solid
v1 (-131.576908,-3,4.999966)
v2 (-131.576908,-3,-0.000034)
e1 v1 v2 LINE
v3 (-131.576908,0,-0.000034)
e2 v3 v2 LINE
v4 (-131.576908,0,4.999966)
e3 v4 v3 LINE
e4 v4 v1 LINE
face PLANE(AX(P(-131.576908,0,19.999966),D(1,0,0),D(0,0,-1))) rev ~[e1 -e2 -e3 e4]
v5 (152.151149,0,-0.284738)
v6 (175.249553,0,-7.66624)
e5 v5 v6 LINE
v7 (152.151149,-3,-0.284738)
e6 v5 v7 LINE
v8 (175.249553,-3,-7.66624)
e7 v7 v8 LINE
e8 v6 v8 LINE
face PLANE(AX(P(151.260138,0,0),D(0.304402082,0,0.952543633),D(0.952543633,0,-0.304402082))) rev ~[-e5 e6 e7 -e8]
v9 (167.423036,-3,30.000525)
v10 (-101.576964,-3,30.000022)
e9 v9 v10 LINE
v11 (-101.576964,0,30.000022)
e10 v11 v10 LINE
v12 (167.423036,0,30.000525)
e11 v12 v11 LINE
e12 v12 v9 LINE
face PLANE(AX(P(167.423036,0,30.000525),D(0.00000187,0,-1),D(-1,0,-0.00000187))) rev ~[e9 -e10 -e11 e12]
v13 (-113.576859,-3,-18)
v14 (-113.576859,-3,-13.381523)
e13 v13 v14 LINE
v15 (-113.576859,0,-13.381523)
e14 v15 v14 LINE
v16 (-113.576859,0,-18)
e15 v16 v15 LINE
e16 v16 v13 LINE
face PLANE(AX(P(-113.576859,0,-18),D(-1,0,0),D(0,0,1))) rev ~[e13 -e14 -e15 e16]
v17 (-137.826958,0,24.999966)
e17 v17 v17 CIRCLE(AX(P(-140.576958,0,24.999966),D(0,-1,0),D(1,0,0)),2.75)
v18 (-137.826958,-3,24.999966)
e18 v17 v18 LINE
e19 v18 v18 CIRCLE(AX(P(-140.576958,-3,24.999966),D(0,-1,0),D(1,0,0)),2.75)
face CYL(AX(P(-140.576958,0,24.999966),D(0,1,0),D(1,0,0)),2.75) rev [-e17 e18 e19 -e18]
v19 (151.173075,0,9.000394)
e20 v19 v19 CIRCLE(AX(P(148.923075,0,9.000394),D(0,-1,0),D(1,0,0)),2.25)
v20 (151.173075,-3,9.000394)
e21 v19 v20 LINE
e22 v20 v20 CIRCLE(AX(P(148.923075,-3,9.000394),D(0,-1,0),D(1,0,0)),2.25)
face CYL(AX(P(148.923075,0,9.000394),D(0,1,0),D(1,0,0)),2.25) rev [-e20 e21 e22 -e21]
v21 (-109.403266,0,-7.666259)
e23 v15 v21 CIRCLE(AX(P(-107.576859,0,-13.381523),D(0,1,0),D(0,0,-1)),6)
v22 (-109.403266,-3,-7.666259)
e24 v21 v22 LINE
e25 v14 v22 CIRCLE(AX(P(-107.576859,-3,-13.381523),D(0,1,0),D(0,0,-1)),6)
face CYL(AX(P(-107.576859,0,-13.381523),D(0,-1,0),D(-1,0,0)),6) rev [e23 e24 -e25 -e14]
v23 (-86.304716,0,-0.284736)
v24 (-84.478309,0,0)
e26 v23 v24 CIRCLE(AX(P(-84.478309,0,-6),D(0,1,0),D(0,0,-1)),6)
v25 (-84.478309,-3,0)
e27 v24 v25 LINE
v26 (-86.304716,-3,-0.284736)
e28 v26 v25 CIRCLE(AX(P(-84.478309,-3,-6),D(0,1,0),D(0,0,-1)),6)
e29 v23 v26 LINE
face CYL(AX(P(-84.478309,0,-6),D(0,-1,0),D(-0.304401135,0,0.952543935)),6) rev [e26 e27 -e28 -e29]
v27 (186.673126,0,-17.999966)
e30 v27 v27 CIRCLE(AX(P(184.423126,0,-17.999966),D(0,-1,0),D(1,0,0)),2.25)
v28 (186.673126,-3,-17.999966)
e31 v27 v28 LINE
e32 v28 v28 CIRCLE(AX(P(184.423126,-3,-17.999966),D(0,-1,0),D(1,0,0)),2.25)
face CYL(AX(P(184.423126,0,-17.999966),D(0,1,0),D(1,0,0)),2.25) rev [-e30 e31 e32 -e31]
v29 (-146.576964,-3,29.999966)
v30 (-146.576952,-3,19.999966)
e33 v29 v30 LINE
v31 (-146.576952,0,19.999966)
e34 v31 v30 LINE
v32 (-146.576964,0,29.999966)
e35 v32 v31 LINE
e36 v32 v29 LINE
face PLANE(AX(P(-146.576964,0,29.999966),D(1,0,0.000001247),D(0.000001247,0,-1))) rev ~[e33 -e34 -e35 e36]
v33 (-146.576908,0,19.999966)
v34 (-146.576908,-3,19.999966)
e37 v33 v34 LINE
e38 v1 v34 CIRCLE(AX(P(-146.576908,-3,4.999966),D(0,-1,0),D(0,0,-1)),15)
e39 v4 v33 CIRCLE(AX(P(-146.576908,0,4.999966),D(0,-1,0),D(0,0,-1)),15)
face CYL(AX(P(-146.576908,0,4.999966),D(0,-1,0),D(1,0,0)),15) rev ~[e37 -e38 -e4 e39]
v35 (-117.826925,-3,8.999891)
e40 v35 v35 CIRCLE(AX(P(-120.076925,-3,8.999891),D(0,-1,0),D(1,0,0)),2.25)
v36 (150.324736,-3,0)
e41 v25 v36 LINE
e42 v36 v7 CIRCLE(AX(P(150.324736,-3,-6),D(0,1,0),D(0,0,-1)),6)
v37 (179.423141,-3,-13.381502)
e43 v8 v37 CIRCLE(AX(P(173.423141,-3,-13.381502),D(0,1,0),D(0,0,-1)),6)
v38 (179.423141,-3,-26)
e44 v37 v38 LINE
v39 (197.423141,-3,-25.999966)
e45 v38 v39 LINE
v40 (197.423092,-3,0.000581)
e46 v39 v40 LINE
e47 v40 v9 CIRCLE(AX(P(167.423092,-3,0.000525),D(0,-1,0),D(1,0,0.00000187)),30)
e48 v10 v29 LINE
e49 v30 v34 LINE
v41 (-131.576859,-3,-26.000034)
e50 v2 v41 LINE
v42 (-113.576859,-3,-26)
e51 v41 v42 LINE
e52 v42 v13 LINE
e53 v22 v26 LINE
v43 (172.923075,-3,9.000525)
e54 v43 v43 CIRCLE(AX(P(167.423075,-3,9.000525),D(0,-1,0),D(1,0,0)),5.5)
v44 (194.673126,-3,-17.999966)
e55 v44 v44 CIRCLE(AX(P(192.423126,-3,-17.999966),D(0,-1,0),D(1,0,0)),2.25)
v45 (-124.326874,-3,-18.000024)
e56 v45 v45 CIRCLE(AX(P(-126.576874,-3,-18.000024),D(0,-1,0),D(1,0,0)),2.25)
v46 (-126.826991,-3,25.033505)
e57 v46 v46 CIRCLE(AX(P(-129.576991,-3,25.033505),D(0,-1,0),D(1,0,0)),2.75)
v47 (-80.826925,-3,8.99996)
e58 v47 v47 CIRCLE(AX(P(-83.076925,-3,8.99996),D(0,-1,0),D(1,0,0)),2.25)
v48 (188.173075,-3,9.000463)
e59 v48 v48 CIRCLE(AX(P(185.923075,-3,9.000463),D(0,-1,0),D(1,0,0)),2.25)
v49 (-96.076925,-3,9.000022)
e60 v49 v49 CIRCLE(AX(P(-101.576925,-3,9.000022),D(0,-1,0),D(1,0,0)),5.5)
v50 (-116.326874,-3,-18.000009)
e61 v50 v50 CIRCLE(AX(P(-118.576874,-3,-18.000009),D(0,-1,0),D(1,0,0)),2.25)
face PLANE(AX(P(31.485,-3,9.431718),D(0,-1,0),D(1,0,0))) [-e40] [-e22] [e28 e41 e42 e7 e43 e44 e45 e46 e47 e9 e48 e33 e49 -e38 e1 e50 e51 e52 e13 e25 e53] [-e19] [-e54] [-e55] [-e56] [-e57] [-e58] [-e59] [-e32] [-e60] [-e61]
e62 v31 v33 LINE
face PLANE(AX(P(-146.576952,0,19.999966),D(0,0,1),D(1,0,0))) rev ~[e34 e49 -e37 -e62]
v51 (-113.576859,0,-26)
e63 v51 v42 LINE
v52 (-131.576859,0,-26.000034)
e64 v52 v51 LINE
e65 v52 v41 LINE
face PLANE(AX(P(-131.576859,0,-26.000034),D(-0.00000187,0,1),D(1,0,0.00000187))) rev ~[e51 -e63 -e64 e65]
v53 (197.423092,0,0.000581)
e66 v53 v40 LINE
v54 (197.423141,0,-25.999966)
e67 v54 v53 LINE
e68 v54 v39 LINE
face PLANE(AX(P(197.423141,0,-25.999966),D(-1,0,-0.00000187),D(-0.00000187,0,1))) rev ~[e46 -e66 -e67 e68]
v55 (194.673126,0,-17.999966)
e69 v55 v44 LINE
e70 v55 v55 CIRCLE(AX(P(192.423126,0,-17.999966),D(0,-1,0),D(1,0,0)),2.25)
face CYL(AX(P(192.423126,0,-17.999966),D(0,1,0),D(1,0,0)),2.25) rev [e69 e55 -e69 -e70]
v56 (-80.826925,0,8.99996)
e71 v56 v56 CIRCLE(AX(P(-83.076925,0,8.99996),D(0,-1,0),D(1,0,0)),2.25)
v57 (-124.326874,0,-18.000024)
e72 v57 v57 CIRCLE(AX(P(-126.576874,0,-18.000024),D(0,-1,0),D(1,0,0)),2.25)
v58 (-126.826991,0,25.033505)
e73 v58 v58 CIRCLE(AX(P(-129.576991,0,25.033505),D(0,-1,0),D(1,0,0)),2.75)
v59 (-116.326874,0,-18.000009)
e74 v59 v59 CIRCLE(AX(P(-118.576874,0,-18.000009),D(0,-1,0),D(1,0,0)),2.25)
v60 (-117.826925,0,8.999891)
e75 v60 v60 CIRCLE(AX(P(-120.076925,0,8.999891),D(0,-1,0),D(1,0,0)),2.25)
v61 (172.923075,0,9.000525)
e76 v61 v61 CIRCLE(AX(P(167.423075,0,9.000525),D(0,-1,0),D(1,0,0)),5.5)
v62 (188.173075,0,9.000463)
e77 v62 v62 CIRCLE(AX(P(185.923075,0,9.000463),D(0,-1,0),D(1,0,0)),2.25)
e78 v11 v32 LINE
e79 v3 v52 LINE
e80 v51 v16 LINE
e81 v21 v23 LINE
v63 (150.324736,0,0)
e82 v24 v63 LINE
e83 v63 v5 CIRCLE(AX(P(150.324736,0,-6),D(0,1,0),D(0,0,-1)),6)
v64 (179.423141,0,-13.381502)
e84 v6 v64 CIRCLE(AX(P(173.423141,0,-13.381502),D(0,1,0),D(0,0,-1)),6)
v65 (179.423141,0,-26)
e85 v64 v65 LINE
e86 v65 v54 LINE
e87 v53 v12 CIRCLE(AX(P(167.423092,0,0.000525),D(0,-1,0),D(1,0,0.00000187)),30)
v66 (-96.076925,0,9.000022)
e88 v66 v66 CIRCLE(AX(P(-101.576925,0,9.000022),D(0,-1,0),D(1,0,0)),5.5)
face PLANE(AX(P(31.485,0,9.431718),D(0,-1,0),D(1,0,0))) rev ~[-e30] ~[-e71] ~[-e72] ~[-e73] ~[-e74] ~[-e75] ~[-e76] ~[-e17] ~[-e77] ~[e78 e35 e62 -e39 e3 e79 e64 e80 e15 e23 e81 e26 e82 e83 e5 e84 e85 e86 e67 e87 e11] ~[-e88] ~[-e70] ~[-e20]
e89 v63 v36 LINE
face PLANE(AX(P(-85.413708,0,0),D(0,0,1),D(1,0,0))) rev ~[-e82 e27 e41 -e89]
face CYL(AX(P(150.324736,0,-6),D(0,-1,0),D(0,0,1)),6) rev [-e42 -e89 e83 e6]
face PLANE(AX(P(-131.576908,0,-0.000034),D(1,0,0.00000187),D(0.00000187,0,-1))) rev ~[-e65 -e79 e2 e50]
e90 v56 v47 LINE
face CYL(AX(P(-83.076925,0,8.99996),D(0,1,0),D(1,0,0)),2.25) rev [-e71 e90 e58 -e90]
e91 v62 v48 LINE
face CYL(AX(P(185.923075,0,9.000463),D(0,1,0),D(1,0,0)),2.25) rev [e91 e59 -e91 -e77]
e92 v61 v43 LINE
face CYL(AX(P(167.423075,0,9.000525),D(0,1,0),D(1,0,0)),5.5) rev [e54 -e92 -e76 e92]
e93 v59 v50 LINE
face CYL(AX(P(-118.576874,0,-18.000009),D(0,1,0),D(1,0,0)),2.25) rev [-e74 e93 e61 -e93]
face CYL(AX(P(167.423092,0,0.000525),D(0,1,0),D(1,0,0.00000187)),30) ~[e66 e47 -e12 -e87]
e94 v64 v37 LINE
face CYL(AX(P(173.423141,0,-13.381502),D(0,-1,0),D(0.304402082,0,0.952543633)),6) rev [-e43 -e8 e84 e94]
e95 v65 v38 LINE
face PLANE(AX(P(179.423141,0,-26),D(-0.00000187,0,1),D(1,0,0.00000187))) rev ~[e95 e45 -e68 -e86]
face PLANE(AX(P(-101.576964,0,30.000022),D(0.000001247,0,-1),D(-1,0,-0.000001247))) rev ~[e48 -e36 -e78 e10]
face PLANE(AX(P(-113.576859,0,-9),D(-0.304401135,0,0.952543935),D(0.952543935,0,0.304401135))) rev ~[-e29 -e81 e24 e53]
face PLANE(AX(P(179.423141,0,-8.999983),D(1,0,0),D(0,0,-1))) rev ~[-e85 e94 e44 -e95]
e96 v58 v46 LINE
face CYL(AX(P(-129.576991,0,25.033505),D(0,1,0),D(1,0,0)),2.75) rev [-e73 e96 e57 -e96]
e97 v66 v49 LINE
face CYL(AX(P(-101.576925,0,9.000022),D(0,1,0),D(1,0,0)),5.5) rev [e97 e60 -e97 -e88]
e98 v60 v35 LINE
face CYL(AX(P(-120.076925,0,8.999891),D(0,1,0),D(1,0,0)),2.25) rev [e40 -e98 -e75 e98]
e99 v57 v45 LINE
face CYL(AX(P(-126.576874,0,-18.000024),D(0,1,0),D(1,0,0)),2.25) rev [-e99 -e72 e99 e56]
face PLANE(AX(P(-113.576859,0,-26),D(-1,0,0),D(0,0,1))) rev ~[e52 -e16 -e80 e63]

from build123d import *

# Parameters (mm, degrees)
F0_R     = 2.25
F0_R_2   = 5.5
F0_R_3   = 2.75
F1_DEPTH = 3
F2_R     = 6
F3_R     = 15


# Not quite as in the source:
# - ends of sketch curves that miss each other by under 0.0002 mm in the source are joined


with BuildPart() as f1:
    # F0 (on Front) → F1 (new body)
    with BuildSketch(Plane.XZ):
        with BuildLine():
            Line((167.4230358146, 30.0005254045), (-101.5769641849, 30.0000224371))
            ThreePointArc((-101.5769641849, 30.0000224371), (-122.790151189, 21.2131862095), (-131.576908088, -3.36535e-05))
            Line((-131.576908088, -3.36535e-05), (-131.5768594728, -26.0000336567))
            Line((-131.5768594728, -26.0000336567), (-113.5768594728, -26))
            Line((-113.5768594728, -26), (-113.5768594728, -18))
            Line((-113.5768594728, -18), (-113.57685947, -9))
            Line((-113.57685947, -9), (-113.5768594672, 0))
            Line((-113.5768594672, 0), (-85.4137075401, 0))
            Line((-85.4137075401, 0), (149.4231405226, 0))
            Line((149.4231405226, 0), (151.260137769, 0))
            Line((151.260137769, 0), (179.4231405277, -8.9999831717))
            Line((179.4231405277, -8.9999831717), (179.4231405277, -17.9999663433))
            Line((179.4231405277, -17.9999663433), (179.4231405277, -26))
            Line((179.4231405277, -26), (197.4231405276, -25.9999663433))
            Line((197.4231405276, -25.9999663433), (197.4230919114, 0.0005814952))
            ThreePointArc((197.4230919114, 0.0005814952), (188.6362556816, 21.2137685033), (167.4230358146, 30.0005254045))
        make_face()
        with Locations((-126.5768744313, -18.0000243076)):
            Circle(F0_R, mode=Mode.SUBTRACT)
        with Locations((-118.5768744313, -18.0000093491)):
            Circle(F0_R, mode=Mode.SUBTRACT)
        with Locations((184.4231255691, -17.9999663433)):
            Circle(F0_R, mode=Mode.SUBTRACT)
        with Locations((192.4231255691, -17.9999663442)):
            Circle(F0_R, mode=Mode.SUBTRACT)
        with Locations((-120.0769249193, 8.9998906191)):
            Circle(F0_R, mode=Mode.SUBTRACT)
        with Locations((-101.5769249198, 9.0000224409)):
            Circle(F0_R_2, mode=Mode.SUBTRACT)
        with Locations((-83.0769249199, 8.9999598022)):
            Circle(F0_R, mode=Mode.SUBTRACT)
        with Locations((148.9230750802, 9.0003935993)):
            Circle(F0_R, mode=Mode.SUBTRACT)
        with Locations((167.4230750797, 9.0005254008)):
            Circle(F0_R_2, mode=Mode.SUBTRACT)
        with Locations((185.9230750796, 9.0004627825)):
            Circle(F0_R, mode=Mode.SUBTRACT)
        with BuildLine():
            ThreePointArc((-131.576908088, -3.36535e-05), (-122.790151189, 21.2131862095), (-101.5769641849, 30.0000224371))
            Line((-101.5769641849, 30.0000224371), (-146.5769641849, 29.999966344))
            Line((-146.5769641849, 29.999966344), (-146.5769517198, 19.999966344))
            Line((-146.5769517198, 19.999966344), (-131.576908088, 19.999966344))
            Line((-131.576908088, 19.999966344), (-131.576908088, -3.36535e-05))
        make_face()
        with Locations((-140.5769579523, 24.999966344)):
            Circle(F0_R_3, mode=Mode.SUBTRACT)
        with Locations((-129.5769910358, 25.0335049432)):
            Circle(F0_R_3, mode=Mode.SUBTRACT)
        Polygon((-113.5768594672, 0), (-113.57685947, -9), (-85.4137075401, 0), align=None)
    extrude(amount=F1_DEPTH)

    # F2
    f2_edges = [f1.edges().sort_by_distance(p)[0] for p in [
        (-113.576859, -1.5, -9),
        (-85.413708, -1.5, 0),
        (151.260138, -1.5, 0),
        (179.423141, -1.5, -8.999983),
    ]]
    fillet(f2_edges, radius=F2_R)

    # F3
    f3_edges = [f1.edges().sort_by_distance(p)[0] for p in [
        (-131.576908, -1.5, 19.999966),
    ]]
    fillet(f3_edges, radius=F3_R)


solid = f1.part
